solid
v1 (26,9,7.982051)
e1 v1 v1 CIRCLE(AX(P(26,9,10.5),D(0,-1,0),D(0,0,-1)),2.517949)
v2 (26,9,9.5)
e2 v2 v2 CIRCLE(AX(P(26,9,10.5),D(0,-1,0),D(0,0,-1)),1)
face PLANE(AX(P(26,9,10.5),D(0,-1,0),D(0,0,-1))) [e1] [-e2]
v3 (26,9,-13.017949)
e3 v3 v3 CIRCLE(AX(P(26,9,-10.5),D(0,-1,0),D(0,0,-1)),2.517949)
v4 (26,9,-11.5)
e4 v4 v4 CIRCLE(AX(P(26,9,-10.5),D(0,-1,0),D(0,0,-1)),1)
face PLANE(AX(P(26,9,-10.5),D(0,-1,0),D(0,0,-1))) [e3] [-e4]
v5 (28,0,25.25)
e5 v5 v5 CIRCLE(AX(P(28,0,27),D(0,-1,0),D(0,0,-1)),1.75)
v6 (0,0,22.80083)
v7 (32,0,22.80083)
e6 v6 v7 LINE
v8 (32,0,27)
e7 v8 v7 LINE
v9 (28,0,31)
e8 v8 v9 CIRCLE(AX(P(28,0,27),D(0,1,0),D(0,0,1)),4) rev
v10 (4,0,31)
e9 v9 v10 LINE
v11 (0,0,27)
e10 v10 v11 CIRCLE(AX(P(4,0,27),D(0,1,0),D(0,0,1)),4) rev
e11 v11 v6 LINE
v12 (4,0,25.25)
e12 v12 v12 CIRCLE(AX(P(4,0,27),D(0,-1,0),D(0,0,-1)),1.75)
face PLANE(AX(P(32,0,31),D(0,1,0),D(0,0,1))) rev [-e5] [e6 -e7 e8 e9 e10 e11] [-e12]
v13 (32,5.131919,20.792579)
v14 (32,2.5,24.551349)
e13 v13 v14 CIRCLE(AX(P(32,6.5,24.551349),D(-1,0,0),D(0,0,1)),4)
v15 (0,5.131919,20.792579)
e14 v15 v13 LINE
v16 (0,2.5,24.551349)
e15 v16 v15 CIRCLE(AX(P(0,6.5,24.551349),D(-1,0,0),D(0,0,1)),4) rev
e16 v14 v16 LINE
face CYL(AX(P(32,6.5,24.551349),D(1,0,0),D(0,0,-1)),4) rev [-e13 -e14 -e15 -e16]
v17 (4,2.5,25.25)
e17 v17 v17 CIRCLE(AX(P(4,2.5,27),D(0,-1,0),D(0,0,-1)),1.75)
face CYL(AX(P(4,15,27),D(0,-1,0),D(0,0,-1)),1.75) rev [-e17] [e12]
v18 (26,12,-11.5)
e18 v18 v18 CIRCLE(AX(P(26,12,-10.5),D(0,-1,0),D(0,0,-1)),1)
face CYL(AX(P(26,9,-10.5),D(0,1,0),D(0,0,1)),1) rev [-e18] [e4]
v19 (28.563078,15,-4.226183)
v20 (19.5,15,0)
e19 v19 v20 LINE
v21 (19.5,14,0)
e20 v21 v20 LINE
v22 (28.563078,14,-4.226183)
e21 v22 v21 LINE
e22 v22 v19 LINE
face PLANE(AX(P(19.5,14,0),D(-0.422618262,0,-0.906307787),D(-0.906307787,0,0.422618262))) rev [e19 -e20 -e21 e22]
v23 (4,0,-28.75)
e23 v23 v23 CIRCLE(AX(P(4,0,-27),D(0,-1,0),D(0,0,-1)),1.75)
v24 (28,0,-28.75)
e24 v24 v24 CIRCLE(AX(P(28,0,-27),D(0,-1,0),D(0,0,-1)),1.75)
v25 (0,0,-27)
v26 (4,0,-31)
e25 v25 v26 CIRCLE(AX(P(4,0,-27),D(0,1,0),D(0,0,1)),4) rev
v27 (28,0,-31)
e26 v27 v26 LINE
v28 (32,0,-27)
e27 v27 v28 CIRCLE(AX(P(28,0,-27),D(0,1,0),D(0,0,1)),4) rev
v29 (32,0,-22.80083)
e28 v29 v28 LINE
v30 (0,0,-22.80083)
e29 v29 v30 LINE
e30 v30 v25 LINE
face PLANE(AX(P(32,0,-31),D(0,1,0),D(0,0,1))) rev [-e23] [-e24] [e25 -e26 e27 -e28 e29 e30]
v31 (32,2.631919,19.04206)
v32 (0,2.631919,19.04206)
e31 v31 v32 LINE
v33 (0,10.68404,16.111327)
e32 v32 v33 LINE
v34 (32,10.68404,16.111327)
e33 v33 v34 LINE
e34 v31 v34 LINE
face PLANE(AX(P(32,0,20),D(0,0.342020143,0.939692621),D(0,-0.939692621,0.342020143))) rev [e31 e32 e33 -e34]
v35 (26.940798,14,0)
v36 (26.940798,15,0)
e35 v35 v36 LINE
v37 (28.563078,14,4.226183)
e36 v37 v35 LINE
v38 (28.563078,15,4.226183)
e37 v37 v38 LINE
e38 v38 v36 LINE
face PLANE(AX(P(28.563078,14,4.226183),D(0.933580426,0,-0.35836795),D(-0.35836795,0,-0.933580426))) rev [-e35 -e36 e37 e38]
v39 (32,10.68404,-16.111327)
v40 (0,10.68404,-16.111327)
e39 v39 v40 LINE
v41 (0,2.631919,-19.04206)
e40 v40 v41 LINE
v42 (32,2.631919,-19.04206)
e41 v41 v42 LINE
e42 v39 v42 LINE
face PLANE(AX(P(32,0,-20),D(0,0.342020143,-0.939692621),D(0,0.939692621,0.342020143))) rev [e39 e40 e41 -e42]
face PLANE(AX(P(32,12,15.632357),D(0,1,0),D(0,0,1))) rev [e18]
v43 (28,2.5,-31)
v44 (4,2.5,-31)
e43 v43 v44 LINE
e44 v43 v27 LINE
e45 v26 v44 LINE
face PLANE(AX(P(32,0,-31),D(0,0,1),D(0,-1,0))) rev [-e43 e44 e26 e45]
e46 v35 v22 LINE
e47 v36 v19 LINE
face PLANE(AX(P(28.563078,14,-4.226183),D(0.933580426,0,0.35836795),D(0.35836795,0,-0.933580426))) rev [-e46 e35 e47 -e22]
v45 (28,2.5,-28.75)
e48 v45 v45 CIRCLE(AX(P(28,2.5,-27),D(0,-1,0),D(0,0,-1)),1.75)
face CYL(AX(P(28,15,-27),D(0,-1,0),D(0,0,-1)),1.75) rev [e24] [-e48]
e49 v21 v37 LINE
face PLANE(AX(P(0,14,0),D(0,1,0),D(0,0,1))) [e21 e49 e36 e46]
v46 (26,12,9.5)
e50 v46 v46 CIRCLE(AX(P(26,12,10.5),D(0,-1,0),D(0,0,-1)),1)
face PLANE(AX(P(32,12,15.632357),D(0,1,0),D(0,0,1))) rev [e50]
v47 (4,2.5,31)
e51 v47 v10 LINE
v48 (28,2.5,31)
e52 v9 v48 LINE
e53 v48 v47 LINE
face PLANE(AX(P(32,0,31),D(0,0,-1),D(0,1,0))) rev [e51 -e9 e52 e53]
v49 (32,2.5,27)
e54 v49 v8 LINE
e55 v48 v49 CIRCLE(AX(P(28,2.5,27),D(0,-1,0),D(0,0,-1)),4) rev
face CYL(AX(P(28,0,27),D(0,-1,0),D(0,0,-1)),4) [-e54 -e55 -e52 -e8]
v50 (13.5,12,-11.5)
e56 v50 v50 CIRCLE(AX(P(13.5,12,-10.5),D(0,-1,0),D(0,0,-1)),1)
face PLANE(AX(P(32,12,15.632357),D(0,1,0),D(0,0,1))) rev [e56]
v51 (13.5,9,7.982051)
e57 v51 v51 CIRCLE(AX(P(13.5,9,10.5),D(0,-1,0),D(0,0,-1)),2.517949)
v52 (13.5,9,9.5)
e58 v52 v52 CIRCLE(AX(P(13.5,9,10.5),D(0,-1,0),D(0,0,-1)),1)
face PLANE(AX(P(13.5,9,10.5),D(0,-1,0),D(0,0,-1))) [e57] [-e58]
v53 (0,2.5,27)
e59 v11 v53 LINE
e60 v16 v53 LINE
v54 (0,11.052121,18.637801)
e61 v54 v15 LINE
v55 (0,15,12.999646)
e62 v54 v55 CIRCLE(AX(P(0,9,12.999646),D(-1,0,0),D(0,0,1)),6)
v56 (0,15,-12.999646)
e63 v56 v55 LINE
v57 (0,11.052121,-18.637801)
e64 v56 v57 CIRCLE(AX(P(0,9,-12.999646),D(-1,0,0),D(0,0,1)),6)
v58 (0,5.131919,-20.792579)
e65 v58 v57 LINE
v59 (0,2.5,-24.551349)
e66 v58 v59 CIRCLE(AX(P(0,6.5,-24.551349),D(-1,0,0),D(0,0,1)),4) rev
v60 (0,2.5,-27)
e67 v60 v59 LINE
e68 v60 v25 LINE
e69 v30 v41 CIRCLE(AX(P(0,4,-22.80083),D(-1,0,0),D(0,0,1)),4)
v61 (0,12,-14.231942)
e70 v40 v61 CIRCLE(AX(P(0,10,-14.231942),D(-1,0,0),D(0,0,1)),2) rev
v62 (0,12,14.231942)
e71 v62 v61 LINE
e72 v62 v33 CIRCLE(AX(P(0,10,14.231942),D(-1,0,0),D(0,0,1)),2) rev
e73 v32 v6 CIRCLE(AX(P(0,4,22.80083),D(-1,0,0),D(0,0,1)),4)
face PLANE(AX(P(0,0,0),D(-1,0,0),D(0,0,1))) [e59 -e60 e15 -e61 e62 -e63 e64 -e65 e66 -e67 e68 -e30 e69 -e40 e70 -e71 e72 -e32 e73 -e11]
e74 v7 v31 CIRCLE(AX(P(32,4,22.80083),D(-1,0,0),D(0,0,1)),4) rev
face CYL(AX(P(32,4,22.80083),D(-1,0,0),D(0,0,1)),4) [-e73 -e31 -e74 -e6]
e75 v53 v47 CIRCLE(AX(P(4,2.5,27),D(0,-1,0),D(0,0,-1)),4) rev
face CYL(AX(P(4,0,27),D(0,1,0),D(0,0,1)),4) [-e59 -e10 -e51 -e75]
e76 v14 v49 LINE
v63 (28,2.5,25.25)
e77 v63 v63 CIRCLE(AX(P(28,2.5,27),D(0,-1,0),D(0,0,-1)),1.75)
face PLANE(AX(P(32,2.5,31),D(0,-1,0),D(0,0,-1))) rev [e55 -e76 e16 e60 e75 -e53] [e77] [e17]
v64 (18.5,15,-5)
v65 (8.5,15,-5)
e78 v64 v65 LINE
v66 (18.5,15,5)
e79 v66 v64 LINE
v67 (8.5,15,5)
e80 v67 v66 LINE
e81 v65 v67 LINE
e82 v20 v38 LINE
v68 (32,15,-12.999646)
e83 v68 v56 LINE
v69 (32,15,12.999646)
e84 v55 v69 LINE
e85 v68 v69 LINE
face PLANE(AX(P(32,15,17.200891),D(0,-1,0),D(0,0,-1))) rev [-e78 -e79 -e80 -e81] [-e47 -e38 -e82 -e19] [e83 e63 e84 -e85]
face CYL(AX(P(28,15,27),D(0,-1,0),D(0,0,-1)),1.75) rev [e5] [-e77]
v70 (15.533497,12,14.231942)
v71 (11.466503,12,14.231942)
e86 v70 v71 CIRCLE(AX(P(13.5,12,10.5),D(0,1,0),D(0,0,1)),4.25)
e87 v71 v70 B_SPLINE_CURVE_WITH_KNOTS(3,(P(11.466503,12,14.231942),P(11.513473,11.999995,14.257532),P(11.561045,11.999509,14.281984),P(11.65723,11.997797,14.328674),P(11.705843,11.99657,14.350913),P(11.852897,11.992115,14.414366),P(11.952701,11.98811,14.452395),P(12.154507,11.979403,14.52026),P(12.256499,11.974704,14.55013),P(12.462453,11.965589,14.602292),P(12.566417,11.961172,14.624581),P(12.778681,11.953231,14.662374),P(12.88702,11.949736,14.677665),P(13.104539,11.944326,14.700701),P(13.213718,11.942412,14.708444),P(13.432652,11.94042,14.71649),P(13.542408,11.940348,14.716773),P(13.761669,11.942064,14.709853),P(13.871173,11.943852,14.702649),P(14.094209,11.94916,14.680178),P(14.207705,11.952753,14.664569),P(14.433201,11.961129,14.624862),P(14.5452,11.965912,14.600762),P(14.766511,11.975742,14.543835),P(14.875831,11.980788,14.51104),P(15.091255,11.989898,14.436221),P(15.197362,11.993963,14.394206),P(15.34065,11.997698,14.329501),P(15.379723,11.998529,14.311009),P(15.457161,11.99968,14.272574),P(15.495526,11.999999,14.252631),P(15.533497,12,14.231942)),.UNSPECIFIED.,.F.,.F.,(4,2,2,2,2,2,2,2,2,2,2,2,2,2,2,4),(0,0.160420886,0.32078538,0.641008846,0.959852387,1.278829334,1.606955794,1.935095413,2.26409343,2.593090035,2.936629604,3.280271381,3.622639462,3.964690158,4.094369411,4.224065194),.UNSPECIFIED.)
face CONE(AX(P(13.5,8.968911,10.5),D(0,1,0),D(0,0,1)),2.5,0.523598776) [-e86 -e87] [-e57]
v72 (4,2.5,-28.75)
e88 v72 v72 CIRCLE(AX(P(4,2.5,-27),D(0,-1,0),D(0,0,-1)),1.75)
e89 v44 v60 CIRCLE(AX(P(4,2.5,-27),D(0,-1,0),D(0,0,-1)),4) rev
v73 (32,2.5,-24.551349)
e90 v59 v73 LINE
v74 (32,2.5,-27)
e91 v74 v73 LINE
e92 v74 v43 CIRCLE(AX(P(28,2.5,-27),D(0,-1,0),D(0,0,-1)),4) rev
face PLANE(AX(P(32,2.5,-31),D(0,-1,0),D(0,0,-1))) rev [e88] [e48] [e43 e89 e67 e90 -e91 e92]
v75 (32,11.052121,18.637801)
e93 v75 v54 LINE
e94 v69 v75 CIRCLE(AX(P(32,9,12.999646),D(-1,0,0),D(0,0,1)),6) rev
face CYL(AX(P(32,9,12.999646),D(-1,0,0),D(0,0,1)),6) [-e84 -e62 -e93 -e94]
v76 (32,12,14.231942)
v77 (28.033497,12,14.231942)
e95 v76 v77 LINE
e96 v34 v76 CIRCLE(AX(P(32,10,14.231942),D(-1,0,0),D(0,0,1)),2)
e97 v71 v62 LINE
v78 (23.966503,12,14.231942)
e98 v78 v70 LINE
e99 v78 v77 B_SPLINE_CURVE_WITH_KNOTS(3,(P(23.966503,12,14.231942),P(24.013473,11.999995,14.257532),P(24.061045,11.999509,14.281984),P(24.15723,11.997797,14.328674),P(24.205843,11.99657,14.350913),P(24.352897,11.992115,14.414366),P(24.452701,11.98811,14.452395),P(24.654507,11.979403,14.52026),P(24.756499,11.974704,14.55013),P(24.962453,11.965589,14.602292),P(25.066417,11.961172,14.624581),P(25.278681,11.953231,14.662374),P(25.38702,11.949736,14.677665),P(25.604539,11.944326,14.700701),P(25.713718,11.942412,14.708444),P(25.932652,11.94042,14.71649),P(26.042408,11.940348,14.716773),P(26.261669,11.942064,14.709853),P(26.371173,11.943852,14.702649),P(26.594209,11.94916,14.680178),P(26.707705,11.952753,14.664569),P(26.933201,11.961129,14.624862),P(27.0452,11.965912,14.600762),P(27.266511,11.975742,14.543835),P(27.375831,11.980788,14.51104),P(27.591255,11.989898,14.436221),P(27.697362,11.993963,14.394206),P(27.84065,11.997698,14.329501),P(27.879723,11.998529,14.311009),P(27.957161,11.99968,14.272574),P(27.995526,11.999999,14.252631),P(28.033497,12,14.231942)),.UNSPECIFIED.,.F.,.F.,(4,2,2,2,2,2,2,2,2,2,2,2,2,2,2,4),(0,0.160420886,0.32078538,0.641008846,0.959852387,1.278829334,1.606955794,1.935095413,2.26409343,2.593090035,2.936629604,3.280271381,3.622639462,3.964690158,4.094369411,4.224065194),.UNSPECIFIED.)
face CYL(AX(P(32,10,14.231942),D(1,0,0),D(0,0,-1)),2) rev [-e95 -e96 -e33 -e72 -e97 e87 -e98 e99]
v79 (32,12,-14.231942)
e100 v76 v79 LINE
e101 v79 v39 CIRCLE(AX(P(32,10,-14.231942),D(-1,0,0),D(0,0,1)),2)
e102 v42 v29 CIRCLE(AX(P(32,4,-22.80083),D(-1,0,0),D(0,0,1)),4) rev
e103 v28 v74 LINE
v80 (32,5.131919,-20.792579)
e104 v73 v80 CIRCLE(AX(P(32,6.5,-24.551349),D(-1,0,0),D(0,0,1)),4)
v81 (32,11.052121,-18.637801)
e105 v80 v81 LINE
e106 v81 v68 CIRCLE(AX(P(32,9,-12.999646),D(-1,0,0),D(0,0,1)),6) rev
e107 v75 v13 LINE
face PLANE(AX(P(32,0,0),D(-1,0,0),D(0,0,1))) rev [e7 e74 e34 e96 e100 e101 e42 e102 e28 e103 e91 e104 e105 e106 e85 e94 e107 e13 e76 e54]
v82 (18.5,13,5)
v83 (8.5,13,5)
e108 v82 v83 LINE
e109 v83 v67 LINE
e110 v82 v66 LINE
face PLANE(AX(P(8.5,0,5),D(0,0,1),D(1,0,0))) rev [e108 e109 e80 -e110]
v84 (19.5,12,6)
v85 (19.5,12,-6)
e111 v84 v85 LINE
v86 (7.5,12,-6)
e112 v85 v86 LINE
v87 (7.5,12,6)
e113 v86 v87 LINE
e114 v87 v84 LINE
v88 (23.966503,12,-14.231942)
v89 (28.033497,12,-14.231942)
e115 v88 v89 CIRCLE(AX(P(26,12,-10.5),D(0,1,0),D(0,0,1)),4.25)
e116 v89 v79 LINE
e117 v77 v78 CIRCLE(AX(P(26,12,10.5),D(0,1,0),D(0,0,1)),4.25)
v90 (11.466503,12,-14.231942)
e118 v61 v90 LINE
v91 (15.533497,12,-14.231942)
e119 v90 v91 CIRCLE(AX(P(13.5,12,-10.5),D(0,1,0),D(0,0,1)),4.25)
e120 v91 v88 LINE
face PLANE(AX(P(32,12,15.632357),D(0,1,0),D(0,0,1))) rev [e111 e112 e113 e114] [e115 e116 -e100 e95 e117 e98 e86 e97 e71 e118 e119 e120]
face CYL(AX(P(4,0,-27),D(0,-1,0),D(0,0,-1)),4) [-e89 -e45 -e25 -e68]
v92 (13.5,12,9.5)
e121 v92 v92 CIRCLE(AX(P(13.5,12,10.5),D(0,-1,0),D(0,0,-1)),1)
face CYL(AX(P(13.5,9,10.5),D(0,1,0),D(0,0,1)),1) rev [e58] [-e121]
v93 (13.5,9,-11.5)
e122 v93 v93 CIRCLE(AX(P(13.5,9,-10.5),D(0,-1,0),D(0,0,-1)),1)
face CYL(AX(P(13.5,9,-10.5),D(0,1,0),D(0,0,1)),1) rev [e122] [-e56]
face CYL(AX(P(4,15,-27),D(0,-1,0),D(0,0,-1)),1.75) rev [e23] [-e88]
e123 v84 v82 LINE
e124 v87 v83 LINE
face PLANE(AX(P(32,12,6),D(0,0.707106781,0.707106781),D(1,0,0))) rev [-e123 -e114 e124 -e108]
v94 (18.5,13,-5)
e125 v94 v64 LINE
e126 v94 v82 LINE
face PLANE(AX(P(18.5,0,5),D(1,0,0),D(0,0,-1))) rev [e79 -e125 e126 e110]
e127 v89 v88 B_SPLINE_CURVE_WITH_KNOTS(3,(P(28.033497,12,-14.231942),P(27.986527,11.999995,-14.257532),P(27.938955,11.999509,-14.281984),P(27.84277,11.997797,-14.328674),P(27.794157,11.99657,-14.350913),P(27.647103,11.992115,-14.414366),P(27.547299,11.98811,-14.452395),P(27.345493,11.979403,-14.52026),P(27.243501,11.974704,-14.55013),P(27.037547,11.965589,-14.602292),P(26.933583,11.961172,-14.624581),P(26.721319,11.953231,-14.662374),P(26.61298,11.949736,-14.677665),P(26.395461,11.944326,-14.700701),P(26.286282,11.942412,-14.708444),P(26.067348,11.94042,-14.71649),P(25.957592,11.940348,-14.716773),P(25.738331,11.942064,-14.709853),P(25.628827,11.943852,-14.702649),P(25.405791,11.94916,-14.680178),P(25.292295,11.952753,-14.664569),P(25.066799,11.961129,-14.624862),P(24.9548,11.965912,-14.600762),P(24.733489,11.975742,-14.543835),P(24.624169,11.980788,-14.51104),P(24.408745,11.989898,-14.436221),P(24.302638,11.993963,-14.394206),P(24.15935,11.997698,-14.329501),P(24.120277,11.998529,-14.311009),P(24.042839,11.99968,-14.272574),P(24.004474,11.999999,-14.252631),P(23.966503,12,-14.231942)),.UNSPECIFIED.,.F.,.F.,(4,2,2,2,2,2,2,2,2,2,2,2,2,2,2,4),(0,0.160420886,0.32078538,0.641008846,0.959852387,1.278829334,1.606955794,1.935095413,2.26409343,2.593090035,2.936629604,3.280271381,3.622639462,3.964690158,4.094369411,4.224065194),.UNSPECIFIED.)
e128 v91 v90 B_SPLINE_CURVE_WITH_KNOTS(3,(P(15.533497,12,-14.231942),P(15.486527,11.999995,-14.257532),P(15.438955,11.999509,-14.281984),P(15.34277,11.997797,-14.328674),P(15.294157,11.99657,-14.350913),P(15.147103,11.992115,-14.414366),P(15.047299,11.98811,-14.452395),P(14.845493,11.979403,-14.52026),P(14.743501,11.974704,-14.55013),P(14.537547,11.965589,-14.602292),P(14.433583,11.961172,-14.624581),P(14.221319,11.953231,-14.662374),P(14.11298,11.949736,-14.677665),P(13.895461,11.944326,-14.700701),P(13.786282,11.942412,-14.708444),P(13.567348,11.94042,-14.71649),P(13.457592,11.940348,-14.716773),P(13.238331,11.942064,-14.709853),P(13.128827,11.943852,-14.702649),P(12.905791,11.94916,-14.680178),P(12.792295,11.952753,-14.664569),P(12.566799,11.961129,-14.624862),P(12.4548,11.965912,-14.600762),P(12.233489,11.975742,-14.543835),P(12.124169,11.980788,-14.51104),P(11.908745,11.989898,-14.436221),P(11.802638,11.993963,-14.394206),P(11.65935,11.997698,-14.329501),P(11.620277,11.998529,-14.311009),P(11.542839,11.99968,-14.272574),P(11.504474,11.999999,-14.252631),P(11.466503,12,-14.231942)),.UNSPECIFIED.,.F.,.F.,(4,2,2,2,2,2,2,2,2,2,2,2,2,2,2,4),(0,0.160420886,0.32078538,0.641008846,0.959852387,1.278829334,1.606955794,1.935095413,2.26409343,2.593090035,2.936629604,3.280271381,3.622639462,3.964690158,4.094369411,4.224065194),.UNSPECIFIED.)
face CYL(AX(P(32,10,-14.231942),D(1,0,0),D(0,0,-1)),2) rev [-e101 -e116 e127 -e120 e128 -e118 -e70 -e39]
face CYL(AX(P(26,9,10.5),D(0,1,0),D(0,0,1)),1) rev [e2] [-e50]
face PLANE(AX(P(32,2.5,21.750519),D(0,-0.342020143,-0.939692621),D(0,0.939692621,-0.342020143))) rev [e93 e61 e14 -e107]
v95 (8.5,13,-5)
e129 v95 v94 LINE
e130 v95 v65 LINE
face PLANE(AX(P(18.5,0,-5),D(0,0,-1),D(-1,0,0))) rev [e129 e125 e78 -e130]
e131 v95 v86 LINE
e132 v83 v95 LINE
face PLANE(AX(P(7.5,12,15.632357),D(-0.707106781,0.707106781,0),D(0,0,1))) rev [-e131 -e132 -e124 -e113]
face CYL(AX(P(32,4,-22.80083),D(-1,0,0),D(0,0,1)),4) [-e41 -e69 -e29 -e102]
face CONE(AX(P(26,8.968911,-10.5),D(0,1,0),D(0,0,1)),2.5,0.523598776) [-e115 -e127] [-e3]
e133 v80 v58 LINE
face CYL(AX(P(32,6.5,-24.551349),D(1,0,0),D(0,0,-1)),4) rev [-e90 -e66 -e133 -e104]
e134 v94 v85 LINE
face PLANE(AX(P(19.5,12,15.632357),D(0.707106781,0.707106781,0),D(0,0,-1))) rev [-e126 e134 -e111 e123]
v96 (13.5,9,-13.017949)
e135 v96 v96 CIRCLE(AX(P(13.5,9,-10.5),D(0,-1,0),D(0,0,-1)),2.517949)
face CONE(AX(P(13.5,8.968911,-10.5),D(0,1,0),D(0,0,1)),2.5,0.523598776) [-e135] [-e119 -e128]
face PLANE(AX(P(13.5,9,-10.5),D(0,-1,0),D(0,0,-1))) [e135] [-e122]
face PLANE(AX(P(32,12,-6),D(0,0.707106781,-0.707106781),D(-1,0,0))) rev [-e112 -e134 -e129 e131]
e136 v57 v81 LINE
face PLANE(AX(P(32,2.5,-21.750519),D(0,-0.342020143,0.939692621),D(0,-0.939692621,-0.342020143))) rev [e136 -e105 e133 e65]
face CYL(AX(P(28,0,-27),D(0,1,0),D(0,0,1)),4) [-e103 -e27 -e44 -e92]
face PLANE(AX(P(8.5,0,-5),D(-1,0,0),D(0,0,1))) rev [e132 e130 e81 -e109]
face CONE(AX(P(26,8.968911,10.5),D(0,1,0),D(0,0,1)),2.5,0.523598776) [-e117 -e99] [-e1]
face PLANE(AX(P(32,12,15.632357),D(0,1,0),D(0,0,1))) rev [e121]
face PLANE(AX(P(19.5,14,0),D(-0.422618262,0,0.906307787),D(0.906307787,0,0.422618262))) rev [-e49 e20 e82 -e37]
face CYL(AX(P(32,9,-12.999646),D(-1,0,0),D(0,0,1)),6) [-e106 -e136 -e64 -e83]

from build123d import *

# Parameters (mm, degrees)
EXTRUDE_1_DEPTH                      = 32
SKETCH_2_R                           = 1.75
CUT_EXTRUDE_1_DEPTH                  = 48.010637094
PATTERN_LINEAR_1_COUNT               = 2
PATTERN_LINEAR_1_PITCH               = 24
PATTERN_LINEAR_1_COUNT_DIR2          = 2
PATTERN_LINEAR_1_PITCH_DIR2          = 54
FILLET_1_R                           = 4
FILLET_3_R                           = 6
FILLET_5_R                           = 4
SKETCH_4_W                           = 10
SKETCH_4_H                           = 10
CUT_EXTRUDE_3_DEPTH                  = 48.010637094
FILLET_6_R                           = 2
SKETCH_3_R                           = 2.5
SKETCH_3_R_2                         = 1
EXTRUDE_3_DEPTH                      = 3
CHAMFER_3_SIZE                       = 1.75
CHAMFER_3_SIZE_2                     = 3.031088913
PATTERN_LINEAR_5_COUNT               = 2
PATTERN_LINEAR_5_PITCH               = 12.5
PATTERN_LINEAR_5_COUNT_DIR2          = 2
PATTERN_LINEAR_5_PITCH_DIR2          = 21
CHAMFER_3_OF_PATTERN_LINEAR_5_SIZE   = 1.75
CHAMFER_3_OF_PATTERN_LINEAR_5_SIZE_2 = 3.031088913
CUT_EXTRUDE_5_DEPTH                  = 1
CHAMFER_4_SIZE                       = 1


with BuildPart() as part:
    # Эскиз1 → Бобышка-Вытянуть1 (new body)
    with BuildSketch(Plane(origin=(0, 0, 0), x_dir=(0, 0, -1), z_dir=(1, 0, 0))):
        Polygon((-31, 0), (-20, 0), (-15.632357189, 12), (15.632357189, 12), (20, 0), (31, 0), (31, 2.5), (21.750518846, 2.5), (17.200890917, 15), (-17.200890917, 15), (-21.750518846, 2.5), (-31, 2.5), align=None)
    extrude(amount=EXTRUDE_1_DEPTH)

    # Эскиз2 → Вырез-Вытянуть1 (cut, through all)
    with BuildSketch(Plane.XZ):
        with Locations(Location((4, 27, 0), (0, 0, 270))):
            Circle(SKETCH_2_R)
    cut_extrude_1 = extrude(amount=-CUT_EXTRUDE_1_DEPTH, mode=Mode.SUBTRACT)

    # Линейный массив1: Cut-Extrude 1 2 × 2
    with Locations(*[(i * PATTERN_LINEAR_1_PITCH, 0, -j * PATTERN_LINEAR_1_PITCH_DIR2) for i in range(PATTERN_LINEAR_1_COUNT) for j in range(PATTERN_LINEAR_1_COUNT_DIR2) if (i, j) != (0, 0)]):
        add(cut_extrude_1, mode=Mode.SUBTRACT)

    # Скругление1
    fillet_1_edges = [part.edges().sort_by_distance(p)[0] for p in [
        (0, 1.25, -31),
        (0, 1.25, 31),
        (32, 1.25, -31),
        (32, 1.25, 31),
    ]]
    fillet(fillet_1_edges, radius=FILLET_1_R)

    # Скругление3
    fillet_3_edges = [part.edges().sort_by_distance(p)[0] for p in [
        (16, 15, 17.200890917),
        (16, 15, -17.200890917),
    ]]
    fillet(fillet_3_edges, radius=FILLET_3_R)

    # Скругление5
    fillet_5_edges = [part.edges().sort_by_distance(p)[0] for p in [
        (16, 2.5, 21.750518846),
        (16, 2.5, -21.750518846),
        (16, 0, -20),
        (16, 0, 20),
    ]]
    fillet(fillet_5_edges, radius=FILLET_5_R)

    # Эскиз4 → Вырез-Вытянуть3 (cut, through all)
    with BuildSketch(Plane(origin=(0, 15, 0), x_dir=(1, 0, 0), z_dir=(0, 1, 0))):
        with Locations((13.5, 0)):
            Rectangle(SKETCH_4_W, SKETCH_4_H)
    extrude(amount=-CUT_EXTRUDE_3_DEPTH, mode=Mode.SUBTRACT)

    # Скругление6
    fillet_6_edges = [part.edges().sort_by_distance(p)[0] for p in [
        (16, 12, -15.632357189),
        (16, 12, 15.632357189),
    ]]
    fillet(fillet_6_edges, radius=FILLET_6_R)

    # Эскиз3 → Бобышка-Вытянуть3 (add)
    with BuildSketch(Plane.XZ.offset(-12)):
        with Locations(Location((26, 10.5, 0), (0, 0, 90))):
            Circle(SKETCH_3_R)
        with Locations(Location((26, 10.5, 0), (0, 0, 270))):
            Circle(SKETCH_3_R_2, mode=Mode.SUBTRACT)
    extrude_3 = extrude(amount=EXTRUDE_3_DEPTH)

    # Фаска3
    # the kernel refuses this chamfer: 3.031088913, 1.75 mm, written as the material it adds along each edge
    with BuildSketch(Plane(origin=(26, 12, 10.5), x_dir=(0, 0, 1), z_dir=(1, 0, 0))) as chamfer_3_piece_1_section:
        Polygon((2.5 + CHAMFER_3_SIZE, 0), (2.5, CHAMFER_3_SIZE_2), (2.5, 0), align=None)
    chamfer_3_piece_1 = revolve(axis=Axis((26, 12, 10.5), (0, -1, 0)), mode=Mode.PRIVATE)
    chamfer_3_piece_1 = split(chamfer_3_piece_1, bisect_by=Plane(origin=(26, 9, 7.119181545), z_dir=(0, 1, 0)), keep=Keep.TOP, mode=Mode.PRIVATE)
    add(chamfer_3_piece_1)

    # Линейный массив5: Extrude 3 2 × 2
    with Locations(*[(-i * PATTERN_LINEAR_5_PITCH, 0, -j * PATTERN_LINEAR_5_PITCH_DIR2) for i in range(PATTERN_LINEAR_5_COUNT) for j in range(PATTERN_LINEAR_5_COUNT_DIR2) if (i, j) != (0, 0)]):
        add(extrude_3)

    # Фаска3 of Линейный массив5
    # the kernel refuses this chamfer: 3.031088913, 1.75 mm, written as the material it adds along each edge
    with BuildSketch(Plane(origin=(26, 12, -10.5), x_dir=(0, 0, 1), z_dir=(1, 0, 0))) as chamfer_3_of_pattern_linear_5_piece_1_section:
        Polygon((2.5 + CHAMFER_3_OF_PATTERN_LINEAR_5_SIZE, 0), (2.5, CHAMFER_3_OF_PATTERN_LINEAR_5_SIZE_2), (2.5, 0), align=None)
    chamfer_3_of_pattern_linear_5_piece_1 = revolve(axis=Axis((26, 12, -10.5), (0, -1, 0)), mode=Mode.PRIVATE)
    chamfer_3_of_pattern_linear_5_piece_1 = split(chamfer_3_of_pattern_linear_5_piece_1, bisect_by=Plane(origin=(26, 9, -13.880818454), z_dir=(0, 1, 0)), keep=Keep.TOP, mode=Mode.PRIVATE)
    add(chamfer_3_of_pattern_linear_5_piece_1)
    with BuildSketch(Plane(origin=(13.5, 12, 10.5), x_dir=(0, 0, 1), z_dir=(1, 0, 0))) as chamfer_3_of_pattern_linear_5_piece_2_section:
        Polygon((2.5 + CHAMFER_3_OF_PATTERN_LINEAR_5_SIZE, 0), (2.5, CHAMFER_3_OF_PATTERN_LINEAR_5_SIZE_2), (2.5, 0), align=None)
    chamfer_3_of_pattern_linear_5_piece_2 = revolve(axis=Axis((13.5, 12, 10.5), (0, -1, 0)), mode=Mode.PRIVATE)
    chamfer_3_of_pattern_linear_5_piece_2 = split(chamfer_3_of_pattern_linear_5_piece_2, bisect_by=Plane(origin=(13.5, 9, 7.119181545), z_dir=(0, 1, 0)), keep=Keep.TOP, mode=Mode.PRIVATE)
    add(chamfer_3_of_pattern_linear_5_piece_2)
    with BuildSketch(Plane(origin=(13.5, 12, -10.5), x_dir=(0, 0, 1), z_dir=(1, 0, 0))) as chamfer_3_of_pattern_linear_5_piece_3_section:
        Polygon((2.5 + CHAMFER_3_OF_PATTERN_LINEAR_5_SIZE, 0), (2.5, CHAMFER_3_OF_PATTERN_LINEAR_5_SIZE_2), (2.5, 0), align=None)
    chamfer_3_of_pattern_linear_5_piece_3 = revolve(axis=Axis((13.5, 12, -10.5), (0, -1, 0)), mode=Mode.PRIVATE)
    chamfer_3_of_pattern_linear_5_piece_3 = split(chamfer_3_of_pattern_linear_5_piece_3, bisect_by=Plane(origin=(13.5, 9, -13.880818454), z_dir=(0, 1, 0)), keep=Keep.TOP, mode=Mode.PRIVATE)
    add(chamfer_3_of_pattern_linear_5_piece_3)

    # Эскиз12 → Вырез-Вытянуть5 (cut)
    with BuildSketch(Plane(origin=(0, 15, 0), x_dir=(1, 0, 0), z_dir=(0, 1, 0))):
        Polygon((19.5, 0), (28.56307787, -4.226182617), (26.940798358, 0), (28.56307787, 4.226182617), align=None)
    extrude(amount=-CUT_EXTRUDE_5_DEPTH, mode=Mode.SUBTRACT)

    # Фаска4
    chamfer_4_edges = [part.edges().sort_by_distance(p)[0] for p in [
        (13.5, 12, 5),
        (8.5, 12, 0),
        (13.5, 12, -5),
        (18.5, 12, 0),
    ]]
    chamfer(chamfer_4_edges, length=CHAMFER_4_SIZE)


solid = part.part
